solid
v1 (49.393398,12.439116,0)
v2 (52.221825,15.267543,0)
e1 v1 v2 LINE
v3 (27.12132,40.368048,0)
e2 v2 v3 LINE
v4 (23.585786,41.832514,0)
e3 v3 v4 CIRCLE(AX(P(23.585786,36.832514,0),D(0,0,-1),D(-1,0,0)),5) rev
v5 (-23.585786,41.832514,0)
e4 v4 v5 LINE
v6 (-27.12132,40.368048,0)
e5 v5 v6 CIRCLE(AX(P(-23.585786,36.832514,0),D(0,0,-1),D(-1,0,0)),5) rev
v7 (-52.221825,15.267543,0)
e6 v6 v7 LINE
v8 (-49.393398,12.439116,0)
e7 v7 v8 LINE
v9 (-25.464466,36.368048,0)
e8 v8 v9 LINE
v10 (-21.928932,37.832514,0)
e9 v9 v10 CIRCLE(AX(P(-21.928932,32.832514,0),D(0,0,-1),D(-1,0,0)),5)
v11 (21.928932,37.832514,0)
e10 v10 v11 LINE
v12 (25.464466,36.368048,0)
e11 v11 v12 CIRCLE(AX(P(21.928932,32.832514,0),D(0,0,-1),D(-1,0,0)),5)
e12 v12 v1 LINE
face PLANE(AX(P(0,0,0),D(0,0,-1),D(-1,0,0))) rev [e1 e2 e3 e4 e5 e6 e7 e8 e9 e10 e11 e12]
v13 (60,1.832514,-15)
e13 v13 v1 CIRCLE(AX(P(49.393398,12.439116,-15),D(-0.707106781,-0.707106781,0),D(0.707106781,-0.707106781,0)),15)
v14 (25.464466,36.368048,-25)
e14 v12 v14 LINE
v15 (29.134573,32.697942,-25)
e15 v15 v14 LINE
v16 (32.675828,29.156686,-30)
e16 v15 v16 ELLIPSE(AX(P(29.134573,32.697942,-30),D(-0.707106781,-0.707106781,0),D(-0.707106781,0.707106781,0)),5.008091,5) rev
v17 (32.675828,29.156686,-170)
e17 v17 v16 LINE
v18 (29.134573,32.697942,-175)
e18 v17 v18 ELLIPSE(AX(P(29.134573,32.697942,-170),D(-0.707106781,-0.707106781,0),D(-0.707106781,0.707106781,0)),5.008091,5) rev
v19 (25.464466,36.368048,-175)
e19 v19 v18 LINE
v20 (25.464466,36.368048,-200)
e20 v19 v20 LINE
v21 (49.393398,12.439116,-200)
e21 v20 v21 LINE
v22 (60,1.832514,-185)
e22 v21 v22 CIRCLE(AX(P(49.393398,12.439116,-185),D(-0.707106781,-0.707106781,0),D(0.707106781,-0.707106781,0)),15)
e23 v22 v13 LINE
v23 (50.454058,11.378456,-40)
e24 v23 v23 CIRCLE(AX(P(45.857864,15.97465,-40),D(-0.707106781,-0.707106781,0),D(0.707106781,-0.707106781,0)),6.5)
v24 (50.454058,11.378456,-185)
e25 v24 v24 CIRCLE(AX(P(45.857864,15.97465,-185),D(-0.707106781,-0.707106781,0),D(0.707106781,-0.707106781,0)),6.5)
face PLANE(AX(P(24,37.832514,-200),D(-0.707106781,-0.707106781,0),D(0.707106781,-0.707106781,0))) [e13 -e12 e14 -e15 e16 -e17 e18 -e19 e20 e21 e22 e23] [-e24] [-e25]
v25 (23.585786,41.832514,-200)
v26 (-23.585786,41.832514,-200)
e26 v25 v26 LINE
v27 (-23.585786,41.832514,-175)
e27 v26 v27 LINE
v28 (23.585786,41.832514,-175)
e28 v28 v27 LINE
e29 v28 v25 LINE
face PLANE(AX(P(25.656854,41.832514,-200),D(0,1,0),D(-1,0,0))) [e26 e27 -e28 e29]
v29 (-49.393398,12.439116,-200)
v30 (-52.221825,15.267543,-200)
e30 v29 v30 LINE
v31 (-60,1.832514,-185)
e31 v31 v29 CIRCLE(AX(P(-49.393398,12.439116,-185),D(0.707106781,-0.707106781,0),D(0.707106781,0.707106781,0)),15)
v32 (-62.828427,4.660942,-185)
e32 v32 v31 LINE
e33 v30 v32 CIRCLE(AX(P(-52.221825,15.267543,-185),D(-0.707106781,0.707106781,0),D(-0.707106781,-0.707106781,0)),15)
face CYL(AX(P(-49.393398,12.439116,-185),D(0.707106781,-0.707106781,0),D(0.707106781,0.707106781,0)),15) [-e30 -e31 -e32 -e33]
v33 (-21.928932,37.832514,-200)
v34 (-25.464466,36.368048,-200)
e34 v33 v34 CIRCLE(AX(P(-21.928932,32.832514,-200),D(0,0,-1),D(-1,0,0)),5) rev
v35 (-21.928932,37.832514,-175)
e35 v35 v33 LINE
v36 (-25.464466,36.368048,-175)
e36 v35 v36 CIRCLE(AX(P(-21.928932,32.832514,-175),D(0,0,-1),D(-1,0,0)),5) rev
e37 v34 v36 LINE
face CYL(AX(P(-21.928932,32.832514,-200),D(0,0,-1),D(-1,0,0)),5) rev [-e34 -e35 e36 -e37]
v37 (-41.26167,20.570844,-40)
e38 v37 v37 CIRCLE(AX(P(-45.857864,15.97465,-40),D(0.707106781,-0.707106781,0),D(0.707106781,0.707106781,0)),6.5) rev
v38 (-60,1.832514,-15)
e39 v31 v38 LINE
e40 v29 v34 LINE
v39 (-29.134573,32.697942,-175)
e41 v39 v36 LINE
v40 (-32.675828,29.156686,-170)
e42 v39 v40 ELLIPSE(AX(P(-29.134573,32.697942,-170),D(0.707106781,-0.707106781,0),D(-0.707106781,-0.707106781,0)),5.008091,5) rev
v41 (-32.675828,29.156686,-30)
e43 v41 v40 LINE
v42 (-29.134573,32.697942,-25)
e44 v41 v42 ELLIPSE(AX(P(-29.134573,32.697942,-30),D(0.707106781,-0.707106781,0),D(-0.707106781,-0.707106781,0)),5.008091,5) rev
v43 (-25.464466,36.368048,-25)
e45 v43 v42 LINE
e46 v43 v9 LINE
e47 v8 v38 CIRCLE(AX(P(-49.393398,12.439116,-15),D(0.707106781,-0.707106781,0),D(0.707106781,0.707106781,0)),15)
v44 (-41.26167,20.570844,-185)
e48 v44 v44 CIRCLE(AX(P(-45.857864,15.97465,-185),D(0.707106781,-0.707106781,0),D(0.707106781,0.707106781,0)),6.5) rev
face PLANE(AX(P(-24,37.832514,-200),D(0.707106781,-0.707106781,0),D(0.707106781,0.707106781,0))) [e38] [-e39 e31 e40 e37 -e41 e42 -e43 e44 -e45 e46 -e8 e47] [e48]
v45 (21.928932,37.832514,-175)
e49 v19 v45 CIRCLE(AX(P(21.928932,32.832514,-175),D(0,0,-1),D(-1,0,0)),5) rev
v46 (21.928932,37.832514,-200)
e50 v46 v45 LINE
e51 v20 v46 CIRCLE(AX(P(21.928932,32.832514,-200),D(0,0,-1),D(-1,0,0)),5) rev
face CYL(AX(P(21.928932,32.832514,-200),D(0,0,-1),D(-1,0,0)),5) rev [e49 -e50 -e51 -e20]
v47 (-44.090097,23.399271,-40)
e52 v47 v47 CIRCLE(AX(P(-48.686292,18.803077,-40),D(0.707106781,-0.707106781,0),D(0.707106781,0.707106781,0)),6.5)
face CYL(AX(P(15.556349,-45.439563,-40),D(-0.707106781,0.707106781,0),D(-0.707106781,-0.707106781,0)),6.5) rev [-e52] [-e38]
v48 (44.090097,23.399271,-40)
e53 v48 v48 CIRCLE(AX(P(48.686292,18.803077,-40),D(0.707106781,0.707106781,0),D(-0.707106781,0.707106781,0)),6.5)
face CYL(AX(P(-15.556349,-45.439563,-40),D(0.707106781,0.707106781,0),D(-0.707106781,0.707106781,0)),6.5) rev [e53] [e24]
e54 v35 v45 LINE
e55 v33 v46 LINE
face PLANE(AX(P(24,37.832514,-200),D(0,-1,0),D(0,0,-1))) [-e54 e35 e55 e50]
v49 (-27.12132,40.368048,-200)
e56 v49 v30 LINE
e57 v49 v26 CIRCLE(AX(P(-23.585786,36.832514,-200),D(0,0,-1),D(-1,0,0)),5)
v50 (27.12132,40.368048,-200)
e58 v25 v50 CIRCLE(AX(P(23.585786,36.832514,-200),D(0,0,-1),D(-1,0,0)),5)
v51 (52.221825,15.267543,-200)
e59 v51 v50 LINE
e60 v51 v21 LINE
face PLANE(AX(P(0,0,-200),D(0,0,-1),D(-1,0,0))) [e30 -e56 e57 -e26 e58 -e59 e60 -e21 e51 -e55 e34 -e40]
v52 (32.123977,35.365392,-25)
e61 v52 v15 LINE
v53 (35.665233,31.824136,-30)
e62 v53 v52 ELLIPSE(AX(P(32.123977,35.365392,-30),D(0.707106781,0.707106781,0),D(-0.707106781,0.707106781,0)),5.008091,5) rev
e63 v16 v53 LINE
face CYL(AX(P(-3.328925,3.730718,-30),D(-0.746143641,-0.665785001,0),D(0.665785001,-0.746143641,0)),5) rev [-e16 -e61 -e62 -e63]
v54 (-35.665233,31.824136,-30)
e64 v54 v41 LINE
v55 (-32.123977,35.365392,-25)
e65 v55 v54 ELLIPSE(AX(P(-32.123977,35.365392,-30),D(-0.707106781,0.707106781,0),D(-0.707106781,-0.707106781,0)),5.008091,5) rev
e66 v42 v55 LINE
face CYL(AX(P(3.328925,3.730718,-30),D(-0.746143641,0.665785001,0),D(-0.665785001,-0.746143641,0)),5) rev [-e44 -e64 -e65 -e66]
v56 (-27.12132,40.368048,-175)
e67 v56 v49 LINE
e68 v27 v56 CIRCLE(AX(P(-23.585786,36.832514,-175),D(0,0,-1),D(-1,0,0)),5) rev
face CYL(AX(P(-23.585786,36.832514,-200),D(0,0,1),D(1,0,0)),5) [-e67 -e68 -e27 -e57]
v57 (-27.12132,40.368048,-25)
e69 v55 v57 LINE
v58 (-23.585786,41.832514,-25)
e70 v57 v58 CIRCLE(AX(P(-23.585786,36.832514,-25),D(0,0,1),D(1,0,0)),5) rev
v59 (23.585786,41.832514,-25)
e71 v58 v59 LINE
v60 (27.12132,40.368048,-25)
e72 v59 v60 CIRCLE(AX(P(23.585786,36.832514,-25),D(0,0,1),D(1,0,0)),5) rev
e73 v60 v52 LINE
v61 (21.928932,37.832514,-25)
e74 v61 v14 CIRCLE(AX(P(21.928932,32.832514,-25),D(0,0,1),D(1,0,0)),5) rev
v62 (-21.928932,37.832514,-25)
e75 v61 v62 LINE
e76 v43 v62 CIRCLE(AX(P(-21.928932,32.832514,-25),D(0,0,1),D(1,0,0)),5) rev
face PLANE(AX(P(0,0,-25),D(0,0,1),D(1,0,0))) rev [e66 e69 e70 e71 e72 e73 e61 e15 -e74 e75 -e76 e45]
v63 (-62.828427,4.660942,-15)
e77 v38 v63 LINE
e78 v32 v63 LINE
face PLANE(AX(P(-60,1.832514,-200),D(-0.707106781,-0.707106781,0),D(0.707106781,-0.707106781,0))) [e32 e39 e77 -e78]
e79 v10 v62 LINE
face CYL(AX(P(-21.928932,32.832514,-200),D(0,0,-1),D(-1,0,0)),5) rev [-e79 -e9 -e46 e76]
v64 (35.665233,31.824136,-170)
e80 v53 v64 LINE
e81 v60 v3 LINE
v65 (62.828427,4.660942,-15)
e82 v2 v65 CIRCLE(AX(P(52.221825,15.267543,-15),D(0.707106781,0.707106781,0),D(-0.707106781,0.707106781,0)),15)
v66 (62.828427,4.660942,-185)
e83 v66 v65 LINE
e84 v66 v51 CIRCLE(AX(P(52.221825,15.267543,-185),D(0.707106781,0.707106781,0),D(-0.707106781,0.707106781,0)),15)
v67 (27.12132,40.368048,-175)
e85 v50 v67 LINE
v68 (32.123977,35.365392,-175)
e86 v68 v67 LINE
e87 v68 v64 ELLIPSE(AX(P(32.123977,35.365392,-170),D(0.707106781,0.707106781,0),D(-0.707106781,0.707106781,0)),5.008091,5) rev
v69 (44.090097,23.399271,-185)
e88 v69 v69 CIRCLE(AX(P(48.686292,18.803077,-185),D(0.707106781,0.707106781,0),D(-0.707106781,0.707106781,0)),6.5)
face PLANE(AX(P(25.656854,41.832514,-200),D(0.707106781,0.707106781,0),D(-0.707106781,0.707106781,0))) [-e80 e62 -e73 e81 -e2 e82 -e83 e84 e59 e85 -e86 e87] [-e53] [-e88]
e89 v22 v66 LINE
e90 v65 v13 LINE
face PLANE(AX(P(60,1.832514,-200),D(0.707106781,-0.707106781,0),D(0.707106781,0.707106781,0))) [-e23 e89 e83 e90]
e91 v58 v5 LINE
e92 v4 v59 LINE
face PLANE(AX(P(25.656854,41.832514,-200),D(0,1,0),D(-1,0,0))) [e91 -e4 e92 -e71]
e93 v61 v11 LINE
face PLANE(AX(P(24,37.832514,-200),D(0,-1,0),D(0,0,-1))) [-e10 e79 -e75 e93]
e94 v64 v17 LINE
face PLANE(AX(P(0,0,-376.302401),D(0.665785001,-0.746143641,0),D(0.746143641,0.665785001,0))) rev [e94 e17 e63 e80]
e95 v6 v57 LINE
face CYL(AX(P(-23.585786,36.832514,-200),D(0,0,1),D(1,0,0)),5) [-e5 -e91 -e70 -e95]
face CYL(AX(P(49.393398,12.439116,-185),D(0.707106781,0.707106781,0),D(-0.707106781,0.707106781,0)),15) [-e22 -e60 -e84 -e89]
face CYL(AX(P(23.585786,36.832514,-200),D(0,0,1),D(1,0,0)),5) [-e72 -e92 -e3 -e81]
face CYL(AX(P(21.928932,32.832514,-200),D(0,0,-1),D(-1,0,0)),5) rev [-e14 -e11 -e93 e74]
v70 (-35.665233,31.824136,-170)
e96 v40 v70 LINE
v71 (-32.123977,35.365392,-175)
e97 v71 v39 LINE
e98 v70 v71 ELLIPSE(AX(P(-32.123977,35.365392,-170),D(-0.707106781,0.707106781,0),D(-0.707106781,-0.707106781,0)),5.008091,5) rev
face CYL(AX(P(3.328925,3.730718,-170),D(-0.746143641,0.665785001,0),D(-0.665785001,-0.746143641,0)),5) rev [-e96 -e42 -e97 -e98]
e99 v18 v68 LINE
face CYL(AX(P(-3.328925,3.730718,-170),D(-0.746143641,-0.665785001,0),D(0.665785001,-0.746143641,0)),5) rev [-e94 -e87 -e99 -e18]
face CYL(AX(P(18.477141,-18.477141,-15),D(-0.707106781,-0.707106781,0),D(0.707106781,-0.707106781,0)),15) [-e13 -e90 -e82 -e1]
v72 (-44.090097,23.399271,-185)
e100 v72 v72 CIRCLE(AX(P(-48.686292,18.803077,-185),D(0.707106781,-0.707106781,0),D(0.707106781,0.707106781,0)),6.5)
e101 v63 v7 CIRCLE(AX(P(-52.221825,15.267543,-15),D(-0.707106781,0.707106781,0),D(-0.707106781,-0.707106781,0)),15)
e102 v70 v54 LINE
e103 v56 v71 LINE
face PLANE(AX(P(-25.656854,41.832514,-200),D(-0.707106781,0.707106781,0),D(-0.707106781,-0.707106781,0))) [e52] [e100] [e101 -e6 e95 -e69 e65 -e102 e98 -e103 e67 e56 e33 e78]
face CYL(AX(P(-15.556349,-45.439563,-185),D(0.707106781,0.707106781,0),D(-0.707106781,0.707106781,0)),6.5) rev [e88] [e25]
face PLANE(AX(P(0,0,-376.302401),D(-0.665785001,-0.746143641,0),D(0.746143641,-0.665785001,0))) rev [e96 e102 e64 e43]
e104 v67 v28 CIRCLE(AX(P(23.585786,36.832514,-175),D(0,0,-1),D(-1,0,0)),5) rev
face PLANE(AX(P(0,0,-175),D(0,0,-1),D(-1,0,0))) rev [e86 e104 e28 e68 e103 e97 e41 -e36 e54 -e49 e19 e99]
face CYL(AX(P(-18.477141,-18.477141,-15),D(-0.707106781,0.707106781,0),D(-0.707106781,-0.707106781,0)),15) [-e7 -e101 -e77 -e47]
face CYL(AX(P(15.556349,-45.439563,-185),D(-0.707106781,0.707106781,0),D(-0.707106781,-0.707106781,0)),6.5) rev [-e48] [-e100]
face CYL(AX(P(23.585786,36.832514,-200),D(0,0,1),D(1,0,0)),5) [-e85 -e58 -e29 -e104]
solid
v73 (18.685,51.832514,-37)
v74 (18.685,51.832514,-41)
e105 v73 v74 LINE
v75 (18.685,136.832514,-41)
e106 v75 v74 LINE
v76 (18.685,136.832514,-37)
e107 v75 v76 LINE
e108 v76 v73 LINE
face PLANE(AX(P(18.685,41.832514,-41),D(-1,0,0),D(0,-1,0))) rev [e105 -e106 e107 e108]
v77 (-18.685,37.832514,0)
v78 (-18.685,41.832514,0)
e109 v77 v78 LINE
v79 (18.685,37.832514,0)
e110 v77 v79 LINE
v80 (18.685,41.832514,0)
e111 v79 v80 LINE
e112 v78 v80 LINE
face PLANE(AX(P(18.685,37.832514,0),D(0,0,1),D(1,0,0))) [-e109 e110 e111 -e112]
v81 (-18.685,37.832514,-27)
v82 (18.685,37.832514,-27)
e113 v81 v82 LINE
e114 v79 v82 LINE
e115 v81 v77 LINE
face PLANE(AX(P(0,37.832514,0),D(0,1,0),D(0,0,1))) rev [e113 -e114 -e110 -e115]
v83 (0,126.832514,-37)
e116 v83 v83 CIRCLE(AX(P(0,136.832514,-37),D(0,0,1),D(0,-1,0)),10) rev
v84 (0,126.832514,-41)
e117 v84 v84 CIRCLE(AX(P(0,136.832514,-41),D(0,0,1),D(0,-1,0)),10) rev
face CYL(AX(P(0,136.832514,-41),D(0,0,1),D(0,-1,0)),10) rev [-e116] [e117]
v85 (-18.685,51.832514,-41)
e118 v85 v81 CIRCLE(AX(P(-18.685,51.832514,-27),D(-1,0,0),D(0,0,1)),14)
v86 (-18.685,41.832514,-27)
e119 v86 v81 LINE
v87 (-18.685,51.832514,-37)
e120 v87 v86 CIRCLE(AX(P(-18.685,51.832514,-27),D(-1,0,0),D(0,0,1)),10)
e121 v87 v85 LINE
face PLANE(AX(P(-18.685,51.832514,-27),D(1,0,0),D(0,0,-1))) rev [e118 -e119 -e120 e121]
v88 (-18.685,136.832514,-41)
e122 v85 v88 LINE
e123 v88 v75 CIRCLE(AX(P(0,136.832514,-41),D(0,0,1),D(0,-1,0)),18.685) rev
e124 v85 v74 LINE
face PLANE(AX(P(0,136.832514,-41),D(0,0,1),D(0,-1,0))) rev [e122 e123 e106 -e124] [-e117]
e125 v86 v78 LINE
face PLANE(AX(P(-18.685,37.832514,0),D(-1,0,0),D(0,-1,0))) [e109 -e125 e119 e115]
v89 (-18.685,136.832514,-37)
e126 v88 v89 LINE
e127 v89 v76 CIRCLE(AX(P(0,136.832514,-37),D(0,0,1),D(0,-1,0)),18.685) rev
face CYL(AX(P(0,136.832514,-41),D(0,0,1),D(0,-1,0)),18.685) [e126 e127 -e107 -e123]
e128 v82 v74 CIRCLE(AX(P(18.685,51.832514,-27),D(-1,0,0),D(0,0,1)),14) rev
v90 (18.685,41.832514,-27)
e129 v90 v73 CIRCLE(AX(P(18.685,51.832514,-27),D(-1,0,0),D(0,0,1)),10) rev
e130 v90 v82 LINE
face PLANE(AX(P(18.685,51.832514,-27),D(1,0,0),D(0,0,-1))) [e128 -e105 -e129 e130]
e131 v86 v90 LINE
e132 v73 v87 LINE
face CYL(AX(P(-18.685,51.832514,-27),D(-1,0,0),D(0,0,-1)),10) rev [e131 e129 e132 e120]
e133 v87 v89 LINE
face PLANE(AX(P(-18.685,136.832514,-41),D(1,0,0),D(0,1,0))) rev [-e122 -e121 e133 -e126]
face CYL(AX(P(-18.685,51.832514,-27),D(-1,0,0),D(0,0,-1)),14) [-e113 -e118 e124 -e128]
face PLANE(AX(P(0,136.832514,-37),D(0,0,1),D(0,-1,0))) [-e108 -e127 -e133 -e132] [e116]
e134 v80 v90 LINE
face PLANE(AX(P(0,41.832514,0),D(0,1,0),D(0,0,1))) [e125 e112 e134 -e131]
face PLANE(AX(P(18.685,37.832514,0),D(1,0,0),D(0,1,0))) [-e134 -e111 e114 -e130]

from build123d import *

# Parameters (mm, degrees)
BOSS_EXTRUDE1_DEPTH          = 200
FILLET3_R                    = 5
CUT_EXTRUDE1_DEPTH           = 150
SKETCH5_W                    = 37.37
SKETCH5_H                    = 41
BASE_FLANGE1_DEPTH           = 4
EDGE_FLANGE1_STRIP_W         = 36
EDGE_FLANGE1_STRIP_H         = 4
EDGE_FLANGE1_STRIP_CUT_DEPTH = 37.37
EDGE_FLANGE1_DEPTH           = 37.37
EDGE_FLANGE1_PROFILE_R       = 10
EDGE_FLANGE1_FLAT_DEPTH      = 4
SKETCH21_R                   = 6.5
CUT_EXTRUDE3_DEPTH           = 254.288349545
FILLET4_R                    = 5
FILLET5_R                    = 15


# Sheet-metal steps are written as plain solids
with BuildPart() as part:
    # Sketch1 → Boss-Extrude1 (new body)
    with BuildSketch(Plane.XY):
        Polygon((24, 37.832514472), (-24, 37.832514472), (-60, 1.832514472), (-62.828427125, 4.660941596), (-25.656854249, 41.832514472), (25.656854249, 41.832514472), (62.828427125, 4.660941596), (60, 1.832514472), align=None)
    extrude(amount=-BOSS_EXTRUDE1_DEPTH)

    # Fillet3
    fillet3_edges = [part.edges().sort_by_distance(p)[0] for p in [
        (-25.656854249, 41.832514472, -100),
        (25.656854249, 41.832514472, -100),
        (24, 37.832514472, -100),
        (-24, 37.832514472, -100),
    ]]
    fillet(fillet3_edges, radius=FILLET3_R)

    # Sketch4 → Cut-Extrude1 (cut)
    with BuildSketch(Plane.XY.offset(-25)):
        Polygon((0, 0), (-80.502525317, 71.832514472), (80.502525317, 71.832514472), align=None)
    extrude(amount=-CUT_EXTRUDE1_DEPTH, mode=Mode.SUBTRACT)

    # Sketch21 → Cut-Extrude3 (cut, through all)
    with BuildSketch(Plane(origin=(33.744684361, 33.744684361, 0), x_dir=(0, 0, -1), z_dir=(0.7071067811865477, 0.7071067811865475, 0))):
        with Locations(Location((185, -21.130623462, 0), (0, 0, 90))):
            Circle(SKETCH21_R)
        with Locations(Location((40, -21.130623462, 0), (0, 0, 90))):
            Circle(SKETCH21_R)
    cut_extrude3 = extrude(amount=-CUT_EXTRUDE3_DEPTH, mode=Mode.SUBTRACT)

    # Mirror1: Cut-Extrude3 across plane
    add(cut_extrude3.mirror(Plane(origin=(0, 0, 0), x_dir=(0, 0, 1), z_dir=(1, 0, 0))), mode=Mode.SUBTRACT)

    # Fillet4
    fillet4_edges = [part.edges().sort_by_distance(p)[0] for p in [
        (34.170530267, 30.490411329, -25),
        (-34.170530267, 30.490411329, -25),
        (-34.170530267, 30.490411329, -175),
        (34.170530267, 30.490411329, -175),
    ]]
    fillet(fillet4_edges, radius=FILLET4_R)

    # Fillet5
    fillet5_edges = [part.edges().sort_by_distance(p)[0] for p in [
        (61.414213562, 3.246728034, 0),
        (61.414213562, 3.246728034, -200),
        (-61.414213562, 3.246728034, -200),
        (-61.414213562, 3.246728034, 0),
    ]]
    fillet(fillet5_edges, radius=FILLET5_R)


with BuildPart() as body_2:
    # Sketch5 → Base-Flange1 (new body)
    with BuildSketch(Plane(origin=(0, 41.832514472, 0), x_dir=(1, 0, 0), z_dir=(0, 1, 0))):
        with Locations((0, 20.5)):
            Rectangle(SKETCH5_W, SKETCH5_H)
    extrude(amount=-BASE_FLANGE1_DEPTH)

    # Edge-Flange1 strip (across the edge) → Edge-Flange1 strip cut (cut)
    with BuildSketch(Plane(origin=(18.685, 41.832514472, -41), x_dir=(0, 0, 1), z_dir=(-1, 0, 0))):
        with Locations((-4, -2)):
            Rectangle(EDGE_FLANGE1_STRIP_W, EDGE_FLANGE1_STRIP_H)
    extrude(amount=EDGE_FLANGE1_STRIP_CUT_DEPTH, mode=Mode.SUBTRACT)

    # Edge-Flange1 bend section (across the edge) → Edge-Flange1 (add)
    with BuildSketch(Plane(origin=(18.685, 41.832514472, -41), x_dir=(0, 0, 1), z_dir=(-1, 0, 0))):
        with BuildLine():
            Line((0, 10), (4, 10))
            ThreePointArc((4, 10), (6.928932188, 2.928932188), (14, 0))
            Line((14, 0), (14, -4))
            ThreePointArc((14, -4), (4.100505063, 0.100505063), (0, 10))
        make_face()
    extrude(amount=EDGE_FLANGE1_DEPTH)

    # Edge-Flange1 profile (on flange) → Edge-Flange1 flat (add)
    with BuildSketch(Plane(origin=(0, 41.832514472, -41), x_dir=(-1, 0, 0), z_dir=(0, 0, -1))):
        with BuildLine():
            ThreePointArc((18.685, 95), (0, 113.685), (-18.685, 95))
            Line((-18.685, 95), (-18.685, 10))
            Line((-18.685, 10), (18.685, 10))
            Line((18.685, 10), (18.685, 95))
        make_face()
        with Locations((0, 95)):
            Circle(EDGE_FLANGE1_PROFILE_R, mode=Mode.SUBTRACT)
    extrude(amount=-EDGE_FLANGE1_FLAT_DEPTH)


solid = Compound([part.part, body_2.part])
